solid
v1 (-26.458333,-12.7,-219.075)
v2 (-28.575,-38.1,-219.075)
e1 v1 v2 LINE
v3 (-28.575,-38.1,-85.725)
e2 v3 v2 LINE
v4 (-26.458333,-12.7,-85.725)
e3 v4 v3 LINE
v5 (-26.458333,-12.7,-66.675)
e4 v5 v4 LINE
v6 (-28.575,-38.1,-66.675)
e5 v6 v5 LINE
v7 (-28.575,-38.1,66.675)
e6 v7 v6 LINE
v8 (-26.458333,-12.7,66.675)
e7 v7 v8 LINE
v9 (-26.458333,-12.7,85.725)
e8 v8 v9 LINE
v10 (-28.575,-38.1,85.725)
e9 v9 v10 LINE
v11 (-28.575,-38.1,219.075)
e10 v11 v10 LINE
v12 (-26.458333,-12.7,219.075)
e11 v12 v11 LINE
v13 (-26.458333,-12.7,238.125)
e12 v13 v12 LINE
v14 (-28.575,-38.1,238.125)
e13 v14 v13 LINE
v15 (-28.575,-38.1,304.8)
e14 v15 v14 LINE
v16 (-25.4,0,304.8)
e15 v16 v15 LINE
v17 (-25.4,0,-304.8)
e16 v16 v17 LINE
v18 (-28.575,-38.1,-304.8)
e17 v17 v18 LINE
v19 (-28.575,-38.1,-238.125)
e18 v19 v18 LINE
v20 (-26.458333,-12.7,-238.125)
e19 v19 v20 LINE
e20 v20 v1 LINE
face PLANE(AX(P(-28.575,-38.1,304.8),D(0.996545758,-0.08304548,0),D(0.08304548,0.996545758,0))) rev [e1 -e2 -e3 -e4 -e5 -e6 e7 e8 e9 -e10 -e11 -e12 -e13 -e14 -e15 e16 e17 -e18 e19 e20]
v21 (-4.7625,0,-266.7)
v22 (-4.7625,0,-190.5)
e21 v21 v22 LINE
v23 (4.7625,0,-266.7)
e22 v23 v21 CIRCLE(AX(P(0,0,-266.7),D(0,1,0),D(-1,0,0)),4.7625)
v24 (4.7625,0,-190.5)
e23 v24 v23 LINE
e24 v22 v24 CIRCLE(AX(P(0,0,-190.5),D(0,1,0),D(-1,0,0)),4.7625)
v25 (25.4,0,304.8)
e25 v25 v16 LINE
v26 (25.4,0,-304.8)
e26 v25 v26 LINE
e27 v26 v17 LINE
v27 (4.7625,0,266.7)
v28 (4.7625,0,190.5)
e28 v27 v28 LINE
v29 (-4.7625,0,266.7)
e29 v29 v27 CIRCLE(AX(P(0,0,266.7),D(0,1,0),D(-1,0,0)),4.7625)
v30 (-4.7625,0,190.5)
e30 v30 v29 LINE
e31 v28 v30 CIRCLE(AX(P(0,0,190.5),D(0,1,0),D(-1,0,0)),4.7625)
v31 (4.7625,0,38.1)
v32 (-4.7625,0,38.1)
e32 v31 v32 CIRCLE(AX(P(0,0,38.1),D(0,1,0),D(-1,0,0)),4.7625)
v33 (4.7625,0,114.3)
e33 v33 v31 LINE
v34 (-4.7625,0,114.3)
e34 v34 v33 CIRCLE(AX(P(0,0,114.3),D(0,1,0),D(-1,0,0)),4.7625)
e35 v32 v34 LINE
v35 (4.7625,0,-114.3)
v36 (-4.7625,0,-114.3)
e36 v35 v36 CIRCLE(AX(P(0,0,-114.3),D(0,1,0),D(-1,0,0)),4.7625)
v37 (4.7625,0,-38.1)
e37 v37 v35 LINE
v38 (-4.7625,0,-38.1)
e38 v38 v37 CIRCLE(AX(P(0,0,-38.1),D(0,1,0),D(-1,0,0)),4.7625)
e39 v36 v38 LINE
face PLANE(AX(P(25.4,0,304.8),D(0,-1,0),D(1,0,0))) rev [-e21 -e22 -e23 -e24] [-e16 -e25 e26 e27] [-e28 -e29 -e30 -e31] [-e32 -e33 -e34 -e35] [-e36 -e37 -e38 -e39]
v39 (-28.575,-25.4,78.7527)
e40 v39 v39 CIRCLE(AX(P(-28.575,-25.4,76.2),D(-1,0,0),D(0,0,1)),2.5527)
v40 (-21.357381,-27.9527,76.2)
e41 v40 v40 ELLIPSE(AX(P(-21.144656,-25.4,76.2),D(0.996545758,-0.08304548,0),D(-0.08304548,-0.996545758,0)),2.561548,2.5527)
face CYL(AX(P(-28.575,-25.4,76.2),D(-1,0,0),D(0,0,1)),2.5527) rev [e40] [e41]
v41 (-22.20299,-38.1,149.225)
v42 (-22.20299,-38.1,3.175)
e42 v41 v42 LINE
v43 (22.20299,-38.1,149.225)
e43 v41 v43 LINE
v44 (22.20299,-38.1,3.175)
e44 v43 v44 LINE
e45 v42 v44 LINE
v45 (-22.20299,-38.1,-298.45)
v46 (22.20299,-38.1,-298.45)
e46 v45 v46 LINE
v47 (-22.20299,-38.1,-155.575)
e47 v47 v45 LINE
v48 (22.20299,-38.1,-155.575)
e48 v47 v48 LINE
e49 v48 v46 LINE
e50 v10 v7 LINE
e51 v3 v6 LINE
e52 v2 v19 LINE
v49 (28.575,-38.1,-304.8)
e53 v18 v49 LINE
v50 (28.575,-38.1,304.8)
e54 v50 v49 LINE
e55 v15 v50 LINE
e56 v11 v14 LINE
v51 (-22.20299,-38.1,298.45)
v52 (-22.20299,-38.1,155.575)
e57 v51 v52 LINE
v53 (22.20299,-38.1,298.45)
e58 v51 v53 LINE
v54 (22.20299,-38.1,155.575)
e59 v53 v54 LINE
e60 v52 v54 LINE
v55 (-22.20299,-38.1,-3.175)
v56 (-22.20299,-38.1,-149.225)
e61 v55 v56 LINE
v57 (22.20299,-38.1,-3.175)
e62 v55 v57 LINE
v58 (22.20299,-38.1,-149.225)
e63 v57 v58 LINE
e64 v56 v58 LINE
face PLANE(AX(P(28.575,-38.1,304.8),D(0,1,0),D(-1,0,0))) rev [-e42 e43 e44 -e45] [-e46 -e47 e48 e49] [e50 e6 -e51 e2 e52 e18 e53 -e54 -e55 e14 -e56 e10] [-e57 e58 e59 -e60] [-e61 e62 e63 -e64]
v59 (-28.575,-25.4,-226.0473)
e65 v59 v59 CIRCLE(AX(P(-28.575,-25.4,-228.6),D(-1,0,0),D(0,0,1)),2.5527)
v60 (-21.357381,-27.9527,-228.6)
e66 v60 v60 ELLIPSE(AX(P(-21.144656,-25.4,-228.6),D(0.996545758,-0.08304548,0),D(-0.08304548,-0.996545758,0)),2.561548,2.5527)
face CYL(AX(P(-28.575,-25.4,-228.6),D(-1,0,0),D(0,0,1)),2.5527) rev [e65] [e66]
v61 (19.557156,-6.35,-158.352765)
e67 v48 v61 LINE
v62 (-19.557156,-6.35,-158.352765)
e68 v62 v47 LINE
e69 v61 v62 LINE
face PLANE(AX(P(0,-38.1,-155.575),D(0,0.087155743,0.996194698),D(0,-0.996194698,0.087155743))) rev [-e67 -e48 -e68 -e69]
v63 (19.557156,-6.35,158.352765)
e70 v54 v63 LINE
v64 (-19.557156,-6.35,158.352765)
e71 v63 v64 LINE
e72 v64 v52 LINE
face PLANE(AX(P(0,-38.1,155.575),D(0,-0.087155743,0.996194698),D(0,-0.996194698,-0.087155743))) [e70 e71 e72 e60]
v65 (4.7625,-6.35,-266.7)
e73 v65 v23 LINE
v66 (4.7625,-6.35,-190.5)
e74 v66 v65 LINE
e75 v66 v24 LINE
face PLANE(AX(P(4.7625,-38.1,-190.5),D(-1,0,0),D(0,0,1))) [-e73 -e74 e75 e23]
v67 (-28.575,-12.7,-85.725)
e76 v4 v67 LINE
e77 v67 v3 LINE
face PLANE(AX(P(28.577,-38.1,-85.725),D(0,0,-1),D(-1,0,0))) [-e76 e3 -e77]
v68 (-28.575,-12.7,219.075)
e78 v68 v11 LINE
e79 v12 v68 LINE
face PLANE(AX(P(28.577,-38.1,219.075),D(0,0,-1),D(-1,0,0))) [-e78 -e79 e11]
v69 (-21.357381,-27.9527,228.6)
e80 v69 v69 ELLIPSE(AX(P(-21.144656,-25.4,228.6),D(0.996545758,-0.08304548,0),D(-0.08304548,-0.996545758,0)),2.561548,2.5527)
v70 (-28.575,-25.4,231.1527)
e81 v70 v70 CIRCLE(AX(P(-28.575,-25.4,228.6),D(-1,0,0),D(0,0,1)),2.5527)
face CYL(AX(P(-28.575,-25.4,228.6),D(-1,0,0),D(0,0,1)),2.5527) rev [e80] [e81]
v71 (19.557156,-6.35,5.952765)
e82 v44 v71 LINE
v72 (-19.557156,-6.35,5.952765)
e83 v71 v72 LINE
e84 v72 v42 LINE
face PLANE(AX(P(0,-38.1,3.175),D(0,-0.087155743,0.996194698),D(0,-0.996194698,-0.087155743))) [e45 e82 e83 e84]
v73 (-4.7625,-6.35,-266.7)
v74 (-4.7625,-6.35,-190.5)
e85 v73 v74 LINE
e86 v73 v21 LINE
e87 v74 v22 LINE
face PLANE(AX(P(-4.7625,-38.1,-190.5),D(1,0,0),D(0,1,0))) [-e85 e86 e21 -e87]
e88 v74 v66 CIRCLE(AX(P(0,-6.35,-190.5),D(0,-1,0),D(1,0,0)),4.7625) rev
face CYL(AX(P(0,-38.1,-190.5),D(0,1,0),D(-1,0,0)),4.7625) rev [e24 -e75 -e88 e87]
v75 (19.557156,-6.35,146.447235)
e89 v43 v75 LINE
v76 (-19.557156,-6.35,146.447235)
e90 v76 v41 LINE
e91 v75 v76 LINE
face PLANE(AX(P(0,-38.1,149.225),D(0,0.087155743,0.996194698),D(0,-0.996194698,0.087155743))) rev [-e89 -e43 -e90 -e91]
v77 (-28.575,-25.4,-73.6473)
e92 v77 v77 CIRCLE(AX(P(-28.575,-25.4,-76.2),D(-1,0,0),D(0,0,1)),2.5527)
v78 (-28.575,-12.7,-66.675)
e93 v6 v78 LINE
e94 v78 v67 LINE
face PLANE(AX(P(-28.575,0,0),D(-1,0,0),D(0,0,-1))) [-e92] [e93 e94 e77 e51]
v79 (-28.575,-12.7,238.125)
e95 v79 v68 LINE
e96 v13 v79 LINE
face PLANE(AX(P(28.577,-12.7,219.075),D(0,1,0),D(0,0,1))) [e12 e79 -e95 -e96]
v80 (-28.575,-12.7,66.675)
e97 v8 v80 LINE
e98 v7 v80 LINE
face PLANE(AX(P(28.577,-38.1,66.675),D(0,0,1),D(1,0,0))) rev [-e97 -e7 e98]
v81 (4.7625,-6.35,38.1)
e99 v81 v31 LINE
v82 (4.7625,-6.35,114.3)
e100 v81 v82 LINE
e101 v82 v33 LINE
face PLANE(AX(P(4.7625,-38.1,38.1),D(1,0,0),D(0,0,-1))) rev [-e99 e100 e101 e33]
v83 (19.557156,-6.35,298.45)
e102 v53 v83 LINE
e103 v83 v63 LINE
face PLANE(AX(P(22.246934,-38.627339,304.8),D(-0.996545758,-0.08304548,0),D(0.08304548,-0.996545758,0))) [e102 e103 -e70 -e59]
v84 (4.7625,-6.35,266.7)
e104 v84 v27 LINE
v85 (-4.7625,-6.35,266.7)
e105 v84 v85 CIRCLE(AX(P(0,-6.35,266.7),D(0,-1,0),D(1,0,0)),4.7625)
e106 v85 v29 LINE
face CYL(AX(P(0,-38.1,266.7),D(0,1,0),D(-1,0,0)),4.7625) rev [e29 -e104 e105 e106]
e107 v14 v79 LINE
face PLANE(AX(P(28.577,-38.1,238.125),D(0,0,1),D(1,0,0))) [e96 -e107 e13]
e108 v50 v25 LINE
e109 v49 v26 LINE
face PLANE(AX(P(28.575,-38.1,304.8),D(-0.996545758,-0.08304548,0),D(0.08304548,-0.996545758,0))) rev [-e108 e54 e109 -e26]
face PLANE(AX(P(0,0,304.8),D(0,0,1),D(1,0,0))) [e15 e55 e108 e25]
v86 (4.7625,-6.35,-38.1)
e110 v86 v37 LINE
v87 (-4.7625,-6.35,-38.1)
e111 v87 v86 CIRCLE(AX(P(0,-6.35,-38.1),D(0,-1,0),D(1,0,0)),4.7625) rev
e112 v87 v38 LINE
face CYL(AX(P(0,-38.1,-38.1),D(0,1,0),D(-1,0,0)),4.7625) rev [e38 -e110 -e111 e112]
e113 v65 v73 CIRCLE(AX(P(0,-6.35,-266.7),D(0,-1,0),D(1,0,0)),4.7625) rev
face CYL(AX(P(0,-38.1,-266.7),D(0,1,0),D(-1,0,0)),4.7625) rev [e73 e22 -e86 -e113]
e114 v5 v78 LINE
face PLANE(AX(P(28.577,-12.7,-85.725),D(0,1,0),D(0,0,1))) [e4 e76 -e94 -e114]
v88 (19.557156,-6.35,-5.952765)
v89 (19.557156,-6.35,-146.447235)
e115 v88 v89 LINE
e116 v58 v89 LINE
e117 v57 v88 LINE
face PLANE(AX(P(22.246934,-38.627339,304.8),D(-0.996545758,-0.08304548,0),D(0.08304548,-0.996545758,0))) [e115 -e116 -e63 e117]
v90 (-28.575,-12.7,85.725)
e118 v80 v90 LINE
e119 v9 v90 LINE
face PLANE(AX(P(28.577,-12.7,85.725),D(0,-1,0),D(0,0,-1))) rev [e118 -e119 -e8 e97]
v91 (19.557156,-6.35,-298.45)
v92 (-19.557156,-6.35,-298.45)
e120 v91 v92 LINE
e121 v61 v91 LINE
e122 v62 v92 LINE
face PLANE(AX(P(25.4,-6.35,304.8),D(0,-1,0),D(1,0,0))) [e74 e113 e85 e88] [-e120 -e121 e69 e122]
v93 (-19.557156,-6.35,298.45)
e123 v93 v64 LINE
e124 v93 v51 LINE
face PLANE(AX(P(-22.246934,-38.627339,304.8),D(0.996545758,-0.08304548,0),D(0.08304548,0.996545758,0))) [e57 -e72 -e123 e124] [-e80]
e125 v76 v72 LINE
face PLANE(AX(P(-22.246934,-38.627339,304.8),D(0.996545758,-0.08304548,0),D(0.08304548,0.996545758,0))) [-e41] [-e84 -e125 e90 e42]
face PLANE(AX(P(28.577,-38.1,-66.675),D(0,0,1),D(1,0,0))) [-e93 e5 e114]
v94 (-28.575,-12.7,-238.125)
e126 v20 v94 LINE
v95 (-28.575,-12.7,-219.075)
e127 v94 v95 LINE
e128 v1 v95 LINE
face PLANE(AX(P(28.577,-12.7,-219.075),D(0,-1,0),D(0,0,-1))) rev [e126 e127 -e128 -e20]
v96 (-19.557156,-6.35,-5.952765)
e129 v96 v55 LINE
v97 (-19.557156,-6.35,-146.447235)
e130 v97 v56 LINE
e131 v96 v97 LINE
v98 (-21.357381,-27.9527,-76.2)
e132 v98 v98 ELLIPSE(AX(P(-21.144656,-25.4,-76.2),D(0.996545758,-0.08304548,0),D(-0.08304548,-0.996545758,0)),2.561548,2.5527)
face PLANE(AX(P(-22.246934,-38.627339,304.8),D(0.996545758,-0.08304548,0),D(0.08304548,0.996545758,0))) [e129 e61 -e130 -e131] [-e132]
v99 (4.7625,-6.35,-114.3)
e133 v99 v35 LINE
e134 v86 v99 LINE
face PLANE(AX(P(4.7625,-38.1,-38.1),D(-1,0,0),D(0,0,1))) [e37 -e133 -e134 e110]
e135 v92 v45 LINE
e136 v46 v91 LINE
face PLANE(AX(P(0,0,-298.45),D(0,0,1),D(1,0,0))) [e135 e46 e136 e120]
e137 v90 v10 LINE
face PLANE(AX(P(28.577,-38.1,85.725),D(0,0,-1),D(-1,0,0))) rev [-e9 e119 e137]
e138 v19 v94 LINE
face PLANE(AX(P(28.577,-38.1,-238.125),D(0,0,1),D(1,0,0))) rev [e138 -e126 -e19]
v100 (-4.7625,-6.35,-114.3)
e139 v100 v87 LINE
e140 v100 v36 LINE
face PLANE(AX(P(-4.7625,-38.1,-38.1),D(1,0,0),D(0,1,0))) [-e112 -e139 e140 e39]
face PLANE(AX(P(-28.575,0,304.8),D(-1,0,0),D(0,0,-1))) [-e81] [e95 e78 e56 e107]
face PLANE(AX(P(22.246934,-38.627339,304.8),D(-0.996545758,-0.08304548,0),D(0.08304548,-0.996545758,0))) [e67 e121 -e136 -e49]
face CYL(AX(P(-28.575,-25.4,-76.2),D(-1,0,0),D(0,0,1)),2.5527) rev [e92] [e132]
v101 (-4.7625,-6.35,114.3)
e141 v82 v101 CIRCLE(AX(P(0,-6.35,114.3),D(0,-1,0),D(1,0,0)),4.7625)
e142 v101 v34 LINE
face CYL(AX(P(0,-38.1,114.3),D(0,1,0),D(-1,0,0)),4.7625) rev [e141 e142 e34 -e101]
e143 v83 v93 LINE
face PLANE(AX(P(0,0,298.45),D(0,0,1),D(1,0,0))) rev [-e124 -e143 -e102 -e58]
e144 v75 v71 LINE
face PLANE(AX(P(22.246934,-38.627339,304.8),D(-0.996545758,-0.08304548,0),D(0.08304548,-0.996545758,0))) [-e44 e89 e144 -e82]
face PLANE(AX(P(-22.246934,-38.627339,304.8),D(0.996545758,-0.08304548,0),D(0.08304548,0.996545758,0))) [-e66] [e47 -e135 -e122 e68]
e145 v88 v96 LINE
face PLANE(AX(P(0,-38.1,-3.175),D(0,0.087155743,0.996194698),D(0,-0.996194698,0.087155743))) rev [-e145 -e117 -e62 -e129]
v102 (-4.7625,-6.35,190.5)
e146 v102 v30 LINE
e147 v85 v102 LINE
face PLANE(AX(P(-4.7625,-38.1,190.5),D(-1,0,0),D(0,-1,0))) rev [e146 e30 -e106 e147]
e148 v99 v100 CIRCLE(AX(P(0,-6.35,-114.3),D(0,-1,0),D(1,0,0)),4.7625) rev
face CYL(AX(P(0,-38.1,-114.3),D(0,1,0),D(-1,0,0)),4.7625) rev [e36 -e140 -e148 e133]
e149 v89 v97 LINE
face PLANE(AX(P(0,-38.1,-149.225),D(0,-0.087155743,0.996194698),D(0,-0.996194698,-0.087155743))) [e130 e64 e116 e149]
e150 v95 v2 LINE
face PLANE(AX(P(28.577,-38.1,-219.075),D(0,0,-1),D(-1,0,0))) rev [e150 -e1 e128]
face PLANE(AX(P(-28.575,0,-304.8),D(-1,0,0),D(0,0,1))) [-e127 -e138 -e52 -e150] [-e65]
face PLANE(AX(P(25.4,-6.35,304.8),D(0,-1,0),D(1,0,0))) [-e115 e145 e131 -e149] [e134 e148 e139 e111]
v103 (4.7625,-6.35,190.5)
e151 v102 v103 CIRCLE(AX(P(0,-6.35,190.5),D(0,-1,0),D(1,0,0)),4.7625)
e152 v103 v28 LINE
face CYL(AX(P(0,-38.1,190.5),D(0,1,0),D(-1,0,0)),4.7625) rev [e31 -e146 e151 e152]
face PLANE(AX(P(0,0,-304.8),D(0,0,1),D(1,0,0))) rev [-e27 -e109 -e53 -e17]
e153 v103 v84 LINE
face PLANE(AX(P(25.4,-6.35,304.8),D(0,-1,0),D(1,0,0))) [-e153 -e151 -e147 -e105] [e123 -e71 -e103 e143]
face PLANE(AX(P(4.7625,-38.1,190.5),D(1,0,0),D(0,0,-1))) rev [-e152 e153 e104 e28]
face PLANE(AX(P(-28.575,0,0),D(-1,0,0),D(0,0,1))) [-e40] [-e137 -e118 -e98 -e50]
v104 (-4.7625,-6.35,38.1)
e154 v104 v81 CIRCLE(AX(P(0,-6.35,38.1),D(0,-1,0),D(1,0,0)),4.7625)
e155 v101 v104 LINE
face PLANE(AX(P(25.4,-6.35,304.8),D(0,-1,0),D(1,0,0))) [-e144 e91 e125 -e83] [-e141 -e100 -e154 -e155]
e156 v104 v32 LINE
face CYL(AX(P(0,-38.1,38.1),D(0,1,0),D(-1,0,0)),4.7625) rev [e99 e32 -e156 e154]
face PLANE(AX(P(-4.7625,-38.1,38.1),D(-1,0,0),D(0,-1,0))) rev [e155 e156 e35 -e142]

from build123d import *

# Parameters (mm, degrees)
BOSS_EXTRUDE1_DEPTH          = 304.8
SHELL1_T                     = -6.35
CUT_EXTRUDE1_DEPTH           = 309.49826681
RIB2_START                   = -22.202989535
RIB2_DEPTH                   = 44.40597907
LPATTERN1_COUNT              = 3
LPATTERN1_PITCH              = 152.4
LPATTERN2_COUNT              = 2
LPATTERN2_PITCH              = 152.4
MIRROR1_COPY_1_DEPTH         = 309.49826681
BOSS_EXTRUDE2_REACH          = 314.443
SKETCH5_W                    = 19.05
SKETCH5_H                    = 25.4
MIRROR4_COPY_1_REACH         = 314.443
MIRROR4_COPY_1_SKETCH_W      = 19.05
MIRROR4_COPY_1_SKETCH_H      = 25.4
F_1_4_20_TAPPED_HOLE1_REACH  = 314.443
F_1_4_20_TAPPED_HOLE1_BORE_R = 2.5527


# Read off the part's stored shape, not the designer's step: Rib2
with BuildPart() as part:
    # Sketch1 → Boss-Extrude1 (new, symmetric)
    with BuildSketch(Plane.XY):
        Polygon((28.575, -38.1), (-28.575, -38.1), (-25.4, 0), (25.4, 0), align=None)
    extrude(amount=BOSS_EXTRUDE1_DEPTH, both=True)

    # Shell1
    shell1_openings = [part.faces().sort_by_distance(p)[0] for p in [
        (0, -38.1, 0),
    ]]
    offset(amount=SHELL1_T, openings=shell1_openings, kind=Kind.INTERSECTION)

    # Sketch2 → Cut-Extrude1 (cut, symmetric)
    with BuildSketch(Plane(origin=(0, 0, 0), x_dir=(1, 0, 0), z_dir=(0, 1, 0))):
        with BuildLine():
            Line((4.7625, -38.1), (4.7625, -114.3))
            ThreePointArc((4.7625, -114.3), (0, -119.0625), (-4.7625, -114.3))
            Line((-4.7625, -114.3), (-4.7625, -38.1))
            ThreePointArc((-4.7625, -38.1), (0, -33.3375), (4.7625, -38.1))
        make_face()
    cut_extrude1 = extrude(amount=CUT_EXTRUDE1_DEPTH, both=True, mode=Mode.SUBTRACT)

    # Rib2 outline → Rib2 (add)
    with BuildSketch(Plane.YZ.offset(RIB2_START)):
        Polygon((-6.35, 146.447234933), (-6.35, 158.352765067), (-38.1, 155.575), (-38.1, 149.225), align=None)
    rib2 = extrude(amount=RIB2_DEPTH)

    # LPattern1: Rib2 ×3
    with Locations(*[(0, 0, -i * LPATTERN1_PITCH) for i in range(1, LPATTERN1_COUNT)]):
        add(rib2)

    # LPattern2: Cut-Extrude1 ×2
    with Locations(*[(0, 0, i * LPATTERN2_PITCH) for i in range(1, LPATTERN2_COUNT)]):
        add(cut_extrude1, mode=Mode.SUBTRACT)

    # Mirror1: Cut-Extrude1 across plane
    add(cut_extrude1.mirror(Plane.XY), mode=Mode.SUBTRACT)

    # Mirror1 copy 1 sketch → Mirror1 copy 1 (cut, symmetric)
    with BuildSketch(Plane(origin=(0, 0, -152.4), x_dir=(1, 0, 0), z_dir=(0, 1, 0))):
        with BuildLine():
            Line((4.7625, 38.1), (4.7625, 114.3))
            ThreePointArc((4.7625, 114.3), (0, 119.0625), (-4.7625, 114.3))
            Line((-4.7625, 114.3), (-4.7625, 38.1))
            ThreePointArc((-4.7625, 38.1), (0, 33.3375), (4.7625, 38.1))
        make_face()
    extrude(amount=MIRROR1_COPY_1_DEPTH, both=True, mode=Mode.SUBTRACT)

    # Sketch5 → Boss-Extrude2 (add, up to next)
    with BuildSketch(Plane(origin=(-28.575, 0, 0), x_dir=(0, 0, -1), z_dir=(1, 0, 0)), mode=Mode.PRIVATE) as boss_extrude2_sk1:
        with Locations((-76.2, -25.4)):
            Rectangle(SKETCH5_W, SKETCH5_H)
    boss_extrude2_tool1 = extrude(boss_extrude2_sk1.sketch, amount=BOSS_EXTRUDE2_REACH, mode=Mode.PRIVATE) - part.part
    boss_extrude2 = boss_extrude2_tool1.solids().sort_by_distance((-28.575, -25.4, 76.2))[0]
    add(boss_extrude2)

    # Mirror2: Boss-Extrude2 across plane
    add(boss_extrude2.mirror(Plane.XY))

    # Mirror3: Boss-Extrude2 across plane
    add(boss_extrude2.mirror(Plane.XY.offset(152.4)))

    # Mirror4 copy 1 sketch → Mirror4 copy 1 (add, up to next)
    with BuildSketch(Plane(origin=(-28.575, 0, -304.8), x_dir=(0, 0, -1), z_dir=(1, 0, 0)), mode=Mode.PRIVATE) as mirror4_copy_1_sk1:
        with Locations((-76.2, -25.4)):
            Rectangle(MIRROR4_COPY_1_SKETCH_W, MIRROR4_COPY_1_SKETCH_H)
    mirror4_copy_1_tool1 = extrude(mirror4_copy_1_sk1.sketch, amount=MIRROR4_COPY_1_REACH, mode=Mode.PRIVATE) - part.part
    add(mirror4_copy_1_tool1.solids().sort_by_distance((-28.575, -25.4, -228.6))[0])

    # 1/4-20 Tapped Hole1 bore → 1/4-20 Tapped Hole1 (cut, up to next)
    with BuildSketch(Plane.ZY.offset(28.575), mode=Mode.PRIVATE) as f_1_4_20_tapped_hole1_sk1:
        with Locations((-228.6, -25.4)):
            Circle(F_1_4_20_TAPPED_HOLE1_BORE_R)
    f_1_4_20_tapped_hole1_tool1 = extrude(f_1_4_20_tapped_hole1_sk1.sketch, amount=-F_1_4_20_TAPPED_HOLE1_REACH, mode=Mode.PRIVATE) & part.part
    # 1/4-20 Tapped Hole1 bore → 1/4-20 Tapped Hole1 (cut, up to next)
    with BuildSketch(Plane.ZY.offset(28.575), mode=Mode.PRIVATE) as f_1_4_20_tapped_hole1_sk2:
        with Locations((-76.2, -25.4)):
            Circle(F_1_4_20_TAPPED_HOLE1_BORE_R)
    f_1_4_20_tapped_hole1_tool2 = extrude(f_1_4_20_tapped_hole1_sk2.sketch, amount=-F_1_4_20_TAPPED_HOLE1_REACH, mode=Mode.PRIVATE) & part.part
    # 1/4-20 Tapped Hole1 bore → 1/4-20 Tapped Hole1 (cut, up to next)
    with BuildSketch(Plane.ZY.offset(28.575), mode=Mode.PRIVATE) as f_1_4_20_tapped_hole1_sk3:
        with Locations((76.2, -25.4)):
            Circle(F_1_4_20_TAPPED_HOLE1_BORE_R)
    f_1_4_20_tapped_hole1_tool3 = extrude(f_1_4_20_tapped_hole1_sk3.sketch, amount=-F_1_4_20_TAPPED_HOLE1_REACH, mode=Mode.PRIVATE) & part.part
    # 1/4-20 Tapped Hole1 bore → 1/4-20 Tapped Hole1 (cut, up to next)
    with BuildSketch(Plane.ZY.offset(28.575), mode=Mode.PRIVATE) as f_1_4_20_tapped_hole1_sk4:
        with Locations((228.6, -25.4)):
            Circle(F_1_4_20_TAPPED_HOLE1_BORE_R)
    f_1_4_20_tapped_hole1_tool4 = extrude(f_1_4_20_tapped_hole1_sk4.sketch, amount=-F_1_4_20_TAPPED_HOLE1_REACH, mode=Mode.PRIVATE) & part.part
    add(f_1_4_20_tapped_hole1_tool1.solids().sort_by_distance((-28.575, -25.4, -228.6))[0], mode=Mode.SUBTRACT)
    add(f_1_4_20_tapped_hole1_tool2.solids().sort_by_distance((-28.575, -25.4, -76.2))[0], mode=Mode.SUBTRACT)
    add(f_1_4_20_tapped_hole1_tool3.solids().sort_by_distance((-28.575, -25.4, 76.2))[0], mode=Mode.SUBTRACT)
    add(f_1_4_20_tapped_hole1_tool4.solids().sort_by_distance((-28.575, -25.4, 228.6))[0], mode=Mode.SUBTRACT)


solid = part.part
